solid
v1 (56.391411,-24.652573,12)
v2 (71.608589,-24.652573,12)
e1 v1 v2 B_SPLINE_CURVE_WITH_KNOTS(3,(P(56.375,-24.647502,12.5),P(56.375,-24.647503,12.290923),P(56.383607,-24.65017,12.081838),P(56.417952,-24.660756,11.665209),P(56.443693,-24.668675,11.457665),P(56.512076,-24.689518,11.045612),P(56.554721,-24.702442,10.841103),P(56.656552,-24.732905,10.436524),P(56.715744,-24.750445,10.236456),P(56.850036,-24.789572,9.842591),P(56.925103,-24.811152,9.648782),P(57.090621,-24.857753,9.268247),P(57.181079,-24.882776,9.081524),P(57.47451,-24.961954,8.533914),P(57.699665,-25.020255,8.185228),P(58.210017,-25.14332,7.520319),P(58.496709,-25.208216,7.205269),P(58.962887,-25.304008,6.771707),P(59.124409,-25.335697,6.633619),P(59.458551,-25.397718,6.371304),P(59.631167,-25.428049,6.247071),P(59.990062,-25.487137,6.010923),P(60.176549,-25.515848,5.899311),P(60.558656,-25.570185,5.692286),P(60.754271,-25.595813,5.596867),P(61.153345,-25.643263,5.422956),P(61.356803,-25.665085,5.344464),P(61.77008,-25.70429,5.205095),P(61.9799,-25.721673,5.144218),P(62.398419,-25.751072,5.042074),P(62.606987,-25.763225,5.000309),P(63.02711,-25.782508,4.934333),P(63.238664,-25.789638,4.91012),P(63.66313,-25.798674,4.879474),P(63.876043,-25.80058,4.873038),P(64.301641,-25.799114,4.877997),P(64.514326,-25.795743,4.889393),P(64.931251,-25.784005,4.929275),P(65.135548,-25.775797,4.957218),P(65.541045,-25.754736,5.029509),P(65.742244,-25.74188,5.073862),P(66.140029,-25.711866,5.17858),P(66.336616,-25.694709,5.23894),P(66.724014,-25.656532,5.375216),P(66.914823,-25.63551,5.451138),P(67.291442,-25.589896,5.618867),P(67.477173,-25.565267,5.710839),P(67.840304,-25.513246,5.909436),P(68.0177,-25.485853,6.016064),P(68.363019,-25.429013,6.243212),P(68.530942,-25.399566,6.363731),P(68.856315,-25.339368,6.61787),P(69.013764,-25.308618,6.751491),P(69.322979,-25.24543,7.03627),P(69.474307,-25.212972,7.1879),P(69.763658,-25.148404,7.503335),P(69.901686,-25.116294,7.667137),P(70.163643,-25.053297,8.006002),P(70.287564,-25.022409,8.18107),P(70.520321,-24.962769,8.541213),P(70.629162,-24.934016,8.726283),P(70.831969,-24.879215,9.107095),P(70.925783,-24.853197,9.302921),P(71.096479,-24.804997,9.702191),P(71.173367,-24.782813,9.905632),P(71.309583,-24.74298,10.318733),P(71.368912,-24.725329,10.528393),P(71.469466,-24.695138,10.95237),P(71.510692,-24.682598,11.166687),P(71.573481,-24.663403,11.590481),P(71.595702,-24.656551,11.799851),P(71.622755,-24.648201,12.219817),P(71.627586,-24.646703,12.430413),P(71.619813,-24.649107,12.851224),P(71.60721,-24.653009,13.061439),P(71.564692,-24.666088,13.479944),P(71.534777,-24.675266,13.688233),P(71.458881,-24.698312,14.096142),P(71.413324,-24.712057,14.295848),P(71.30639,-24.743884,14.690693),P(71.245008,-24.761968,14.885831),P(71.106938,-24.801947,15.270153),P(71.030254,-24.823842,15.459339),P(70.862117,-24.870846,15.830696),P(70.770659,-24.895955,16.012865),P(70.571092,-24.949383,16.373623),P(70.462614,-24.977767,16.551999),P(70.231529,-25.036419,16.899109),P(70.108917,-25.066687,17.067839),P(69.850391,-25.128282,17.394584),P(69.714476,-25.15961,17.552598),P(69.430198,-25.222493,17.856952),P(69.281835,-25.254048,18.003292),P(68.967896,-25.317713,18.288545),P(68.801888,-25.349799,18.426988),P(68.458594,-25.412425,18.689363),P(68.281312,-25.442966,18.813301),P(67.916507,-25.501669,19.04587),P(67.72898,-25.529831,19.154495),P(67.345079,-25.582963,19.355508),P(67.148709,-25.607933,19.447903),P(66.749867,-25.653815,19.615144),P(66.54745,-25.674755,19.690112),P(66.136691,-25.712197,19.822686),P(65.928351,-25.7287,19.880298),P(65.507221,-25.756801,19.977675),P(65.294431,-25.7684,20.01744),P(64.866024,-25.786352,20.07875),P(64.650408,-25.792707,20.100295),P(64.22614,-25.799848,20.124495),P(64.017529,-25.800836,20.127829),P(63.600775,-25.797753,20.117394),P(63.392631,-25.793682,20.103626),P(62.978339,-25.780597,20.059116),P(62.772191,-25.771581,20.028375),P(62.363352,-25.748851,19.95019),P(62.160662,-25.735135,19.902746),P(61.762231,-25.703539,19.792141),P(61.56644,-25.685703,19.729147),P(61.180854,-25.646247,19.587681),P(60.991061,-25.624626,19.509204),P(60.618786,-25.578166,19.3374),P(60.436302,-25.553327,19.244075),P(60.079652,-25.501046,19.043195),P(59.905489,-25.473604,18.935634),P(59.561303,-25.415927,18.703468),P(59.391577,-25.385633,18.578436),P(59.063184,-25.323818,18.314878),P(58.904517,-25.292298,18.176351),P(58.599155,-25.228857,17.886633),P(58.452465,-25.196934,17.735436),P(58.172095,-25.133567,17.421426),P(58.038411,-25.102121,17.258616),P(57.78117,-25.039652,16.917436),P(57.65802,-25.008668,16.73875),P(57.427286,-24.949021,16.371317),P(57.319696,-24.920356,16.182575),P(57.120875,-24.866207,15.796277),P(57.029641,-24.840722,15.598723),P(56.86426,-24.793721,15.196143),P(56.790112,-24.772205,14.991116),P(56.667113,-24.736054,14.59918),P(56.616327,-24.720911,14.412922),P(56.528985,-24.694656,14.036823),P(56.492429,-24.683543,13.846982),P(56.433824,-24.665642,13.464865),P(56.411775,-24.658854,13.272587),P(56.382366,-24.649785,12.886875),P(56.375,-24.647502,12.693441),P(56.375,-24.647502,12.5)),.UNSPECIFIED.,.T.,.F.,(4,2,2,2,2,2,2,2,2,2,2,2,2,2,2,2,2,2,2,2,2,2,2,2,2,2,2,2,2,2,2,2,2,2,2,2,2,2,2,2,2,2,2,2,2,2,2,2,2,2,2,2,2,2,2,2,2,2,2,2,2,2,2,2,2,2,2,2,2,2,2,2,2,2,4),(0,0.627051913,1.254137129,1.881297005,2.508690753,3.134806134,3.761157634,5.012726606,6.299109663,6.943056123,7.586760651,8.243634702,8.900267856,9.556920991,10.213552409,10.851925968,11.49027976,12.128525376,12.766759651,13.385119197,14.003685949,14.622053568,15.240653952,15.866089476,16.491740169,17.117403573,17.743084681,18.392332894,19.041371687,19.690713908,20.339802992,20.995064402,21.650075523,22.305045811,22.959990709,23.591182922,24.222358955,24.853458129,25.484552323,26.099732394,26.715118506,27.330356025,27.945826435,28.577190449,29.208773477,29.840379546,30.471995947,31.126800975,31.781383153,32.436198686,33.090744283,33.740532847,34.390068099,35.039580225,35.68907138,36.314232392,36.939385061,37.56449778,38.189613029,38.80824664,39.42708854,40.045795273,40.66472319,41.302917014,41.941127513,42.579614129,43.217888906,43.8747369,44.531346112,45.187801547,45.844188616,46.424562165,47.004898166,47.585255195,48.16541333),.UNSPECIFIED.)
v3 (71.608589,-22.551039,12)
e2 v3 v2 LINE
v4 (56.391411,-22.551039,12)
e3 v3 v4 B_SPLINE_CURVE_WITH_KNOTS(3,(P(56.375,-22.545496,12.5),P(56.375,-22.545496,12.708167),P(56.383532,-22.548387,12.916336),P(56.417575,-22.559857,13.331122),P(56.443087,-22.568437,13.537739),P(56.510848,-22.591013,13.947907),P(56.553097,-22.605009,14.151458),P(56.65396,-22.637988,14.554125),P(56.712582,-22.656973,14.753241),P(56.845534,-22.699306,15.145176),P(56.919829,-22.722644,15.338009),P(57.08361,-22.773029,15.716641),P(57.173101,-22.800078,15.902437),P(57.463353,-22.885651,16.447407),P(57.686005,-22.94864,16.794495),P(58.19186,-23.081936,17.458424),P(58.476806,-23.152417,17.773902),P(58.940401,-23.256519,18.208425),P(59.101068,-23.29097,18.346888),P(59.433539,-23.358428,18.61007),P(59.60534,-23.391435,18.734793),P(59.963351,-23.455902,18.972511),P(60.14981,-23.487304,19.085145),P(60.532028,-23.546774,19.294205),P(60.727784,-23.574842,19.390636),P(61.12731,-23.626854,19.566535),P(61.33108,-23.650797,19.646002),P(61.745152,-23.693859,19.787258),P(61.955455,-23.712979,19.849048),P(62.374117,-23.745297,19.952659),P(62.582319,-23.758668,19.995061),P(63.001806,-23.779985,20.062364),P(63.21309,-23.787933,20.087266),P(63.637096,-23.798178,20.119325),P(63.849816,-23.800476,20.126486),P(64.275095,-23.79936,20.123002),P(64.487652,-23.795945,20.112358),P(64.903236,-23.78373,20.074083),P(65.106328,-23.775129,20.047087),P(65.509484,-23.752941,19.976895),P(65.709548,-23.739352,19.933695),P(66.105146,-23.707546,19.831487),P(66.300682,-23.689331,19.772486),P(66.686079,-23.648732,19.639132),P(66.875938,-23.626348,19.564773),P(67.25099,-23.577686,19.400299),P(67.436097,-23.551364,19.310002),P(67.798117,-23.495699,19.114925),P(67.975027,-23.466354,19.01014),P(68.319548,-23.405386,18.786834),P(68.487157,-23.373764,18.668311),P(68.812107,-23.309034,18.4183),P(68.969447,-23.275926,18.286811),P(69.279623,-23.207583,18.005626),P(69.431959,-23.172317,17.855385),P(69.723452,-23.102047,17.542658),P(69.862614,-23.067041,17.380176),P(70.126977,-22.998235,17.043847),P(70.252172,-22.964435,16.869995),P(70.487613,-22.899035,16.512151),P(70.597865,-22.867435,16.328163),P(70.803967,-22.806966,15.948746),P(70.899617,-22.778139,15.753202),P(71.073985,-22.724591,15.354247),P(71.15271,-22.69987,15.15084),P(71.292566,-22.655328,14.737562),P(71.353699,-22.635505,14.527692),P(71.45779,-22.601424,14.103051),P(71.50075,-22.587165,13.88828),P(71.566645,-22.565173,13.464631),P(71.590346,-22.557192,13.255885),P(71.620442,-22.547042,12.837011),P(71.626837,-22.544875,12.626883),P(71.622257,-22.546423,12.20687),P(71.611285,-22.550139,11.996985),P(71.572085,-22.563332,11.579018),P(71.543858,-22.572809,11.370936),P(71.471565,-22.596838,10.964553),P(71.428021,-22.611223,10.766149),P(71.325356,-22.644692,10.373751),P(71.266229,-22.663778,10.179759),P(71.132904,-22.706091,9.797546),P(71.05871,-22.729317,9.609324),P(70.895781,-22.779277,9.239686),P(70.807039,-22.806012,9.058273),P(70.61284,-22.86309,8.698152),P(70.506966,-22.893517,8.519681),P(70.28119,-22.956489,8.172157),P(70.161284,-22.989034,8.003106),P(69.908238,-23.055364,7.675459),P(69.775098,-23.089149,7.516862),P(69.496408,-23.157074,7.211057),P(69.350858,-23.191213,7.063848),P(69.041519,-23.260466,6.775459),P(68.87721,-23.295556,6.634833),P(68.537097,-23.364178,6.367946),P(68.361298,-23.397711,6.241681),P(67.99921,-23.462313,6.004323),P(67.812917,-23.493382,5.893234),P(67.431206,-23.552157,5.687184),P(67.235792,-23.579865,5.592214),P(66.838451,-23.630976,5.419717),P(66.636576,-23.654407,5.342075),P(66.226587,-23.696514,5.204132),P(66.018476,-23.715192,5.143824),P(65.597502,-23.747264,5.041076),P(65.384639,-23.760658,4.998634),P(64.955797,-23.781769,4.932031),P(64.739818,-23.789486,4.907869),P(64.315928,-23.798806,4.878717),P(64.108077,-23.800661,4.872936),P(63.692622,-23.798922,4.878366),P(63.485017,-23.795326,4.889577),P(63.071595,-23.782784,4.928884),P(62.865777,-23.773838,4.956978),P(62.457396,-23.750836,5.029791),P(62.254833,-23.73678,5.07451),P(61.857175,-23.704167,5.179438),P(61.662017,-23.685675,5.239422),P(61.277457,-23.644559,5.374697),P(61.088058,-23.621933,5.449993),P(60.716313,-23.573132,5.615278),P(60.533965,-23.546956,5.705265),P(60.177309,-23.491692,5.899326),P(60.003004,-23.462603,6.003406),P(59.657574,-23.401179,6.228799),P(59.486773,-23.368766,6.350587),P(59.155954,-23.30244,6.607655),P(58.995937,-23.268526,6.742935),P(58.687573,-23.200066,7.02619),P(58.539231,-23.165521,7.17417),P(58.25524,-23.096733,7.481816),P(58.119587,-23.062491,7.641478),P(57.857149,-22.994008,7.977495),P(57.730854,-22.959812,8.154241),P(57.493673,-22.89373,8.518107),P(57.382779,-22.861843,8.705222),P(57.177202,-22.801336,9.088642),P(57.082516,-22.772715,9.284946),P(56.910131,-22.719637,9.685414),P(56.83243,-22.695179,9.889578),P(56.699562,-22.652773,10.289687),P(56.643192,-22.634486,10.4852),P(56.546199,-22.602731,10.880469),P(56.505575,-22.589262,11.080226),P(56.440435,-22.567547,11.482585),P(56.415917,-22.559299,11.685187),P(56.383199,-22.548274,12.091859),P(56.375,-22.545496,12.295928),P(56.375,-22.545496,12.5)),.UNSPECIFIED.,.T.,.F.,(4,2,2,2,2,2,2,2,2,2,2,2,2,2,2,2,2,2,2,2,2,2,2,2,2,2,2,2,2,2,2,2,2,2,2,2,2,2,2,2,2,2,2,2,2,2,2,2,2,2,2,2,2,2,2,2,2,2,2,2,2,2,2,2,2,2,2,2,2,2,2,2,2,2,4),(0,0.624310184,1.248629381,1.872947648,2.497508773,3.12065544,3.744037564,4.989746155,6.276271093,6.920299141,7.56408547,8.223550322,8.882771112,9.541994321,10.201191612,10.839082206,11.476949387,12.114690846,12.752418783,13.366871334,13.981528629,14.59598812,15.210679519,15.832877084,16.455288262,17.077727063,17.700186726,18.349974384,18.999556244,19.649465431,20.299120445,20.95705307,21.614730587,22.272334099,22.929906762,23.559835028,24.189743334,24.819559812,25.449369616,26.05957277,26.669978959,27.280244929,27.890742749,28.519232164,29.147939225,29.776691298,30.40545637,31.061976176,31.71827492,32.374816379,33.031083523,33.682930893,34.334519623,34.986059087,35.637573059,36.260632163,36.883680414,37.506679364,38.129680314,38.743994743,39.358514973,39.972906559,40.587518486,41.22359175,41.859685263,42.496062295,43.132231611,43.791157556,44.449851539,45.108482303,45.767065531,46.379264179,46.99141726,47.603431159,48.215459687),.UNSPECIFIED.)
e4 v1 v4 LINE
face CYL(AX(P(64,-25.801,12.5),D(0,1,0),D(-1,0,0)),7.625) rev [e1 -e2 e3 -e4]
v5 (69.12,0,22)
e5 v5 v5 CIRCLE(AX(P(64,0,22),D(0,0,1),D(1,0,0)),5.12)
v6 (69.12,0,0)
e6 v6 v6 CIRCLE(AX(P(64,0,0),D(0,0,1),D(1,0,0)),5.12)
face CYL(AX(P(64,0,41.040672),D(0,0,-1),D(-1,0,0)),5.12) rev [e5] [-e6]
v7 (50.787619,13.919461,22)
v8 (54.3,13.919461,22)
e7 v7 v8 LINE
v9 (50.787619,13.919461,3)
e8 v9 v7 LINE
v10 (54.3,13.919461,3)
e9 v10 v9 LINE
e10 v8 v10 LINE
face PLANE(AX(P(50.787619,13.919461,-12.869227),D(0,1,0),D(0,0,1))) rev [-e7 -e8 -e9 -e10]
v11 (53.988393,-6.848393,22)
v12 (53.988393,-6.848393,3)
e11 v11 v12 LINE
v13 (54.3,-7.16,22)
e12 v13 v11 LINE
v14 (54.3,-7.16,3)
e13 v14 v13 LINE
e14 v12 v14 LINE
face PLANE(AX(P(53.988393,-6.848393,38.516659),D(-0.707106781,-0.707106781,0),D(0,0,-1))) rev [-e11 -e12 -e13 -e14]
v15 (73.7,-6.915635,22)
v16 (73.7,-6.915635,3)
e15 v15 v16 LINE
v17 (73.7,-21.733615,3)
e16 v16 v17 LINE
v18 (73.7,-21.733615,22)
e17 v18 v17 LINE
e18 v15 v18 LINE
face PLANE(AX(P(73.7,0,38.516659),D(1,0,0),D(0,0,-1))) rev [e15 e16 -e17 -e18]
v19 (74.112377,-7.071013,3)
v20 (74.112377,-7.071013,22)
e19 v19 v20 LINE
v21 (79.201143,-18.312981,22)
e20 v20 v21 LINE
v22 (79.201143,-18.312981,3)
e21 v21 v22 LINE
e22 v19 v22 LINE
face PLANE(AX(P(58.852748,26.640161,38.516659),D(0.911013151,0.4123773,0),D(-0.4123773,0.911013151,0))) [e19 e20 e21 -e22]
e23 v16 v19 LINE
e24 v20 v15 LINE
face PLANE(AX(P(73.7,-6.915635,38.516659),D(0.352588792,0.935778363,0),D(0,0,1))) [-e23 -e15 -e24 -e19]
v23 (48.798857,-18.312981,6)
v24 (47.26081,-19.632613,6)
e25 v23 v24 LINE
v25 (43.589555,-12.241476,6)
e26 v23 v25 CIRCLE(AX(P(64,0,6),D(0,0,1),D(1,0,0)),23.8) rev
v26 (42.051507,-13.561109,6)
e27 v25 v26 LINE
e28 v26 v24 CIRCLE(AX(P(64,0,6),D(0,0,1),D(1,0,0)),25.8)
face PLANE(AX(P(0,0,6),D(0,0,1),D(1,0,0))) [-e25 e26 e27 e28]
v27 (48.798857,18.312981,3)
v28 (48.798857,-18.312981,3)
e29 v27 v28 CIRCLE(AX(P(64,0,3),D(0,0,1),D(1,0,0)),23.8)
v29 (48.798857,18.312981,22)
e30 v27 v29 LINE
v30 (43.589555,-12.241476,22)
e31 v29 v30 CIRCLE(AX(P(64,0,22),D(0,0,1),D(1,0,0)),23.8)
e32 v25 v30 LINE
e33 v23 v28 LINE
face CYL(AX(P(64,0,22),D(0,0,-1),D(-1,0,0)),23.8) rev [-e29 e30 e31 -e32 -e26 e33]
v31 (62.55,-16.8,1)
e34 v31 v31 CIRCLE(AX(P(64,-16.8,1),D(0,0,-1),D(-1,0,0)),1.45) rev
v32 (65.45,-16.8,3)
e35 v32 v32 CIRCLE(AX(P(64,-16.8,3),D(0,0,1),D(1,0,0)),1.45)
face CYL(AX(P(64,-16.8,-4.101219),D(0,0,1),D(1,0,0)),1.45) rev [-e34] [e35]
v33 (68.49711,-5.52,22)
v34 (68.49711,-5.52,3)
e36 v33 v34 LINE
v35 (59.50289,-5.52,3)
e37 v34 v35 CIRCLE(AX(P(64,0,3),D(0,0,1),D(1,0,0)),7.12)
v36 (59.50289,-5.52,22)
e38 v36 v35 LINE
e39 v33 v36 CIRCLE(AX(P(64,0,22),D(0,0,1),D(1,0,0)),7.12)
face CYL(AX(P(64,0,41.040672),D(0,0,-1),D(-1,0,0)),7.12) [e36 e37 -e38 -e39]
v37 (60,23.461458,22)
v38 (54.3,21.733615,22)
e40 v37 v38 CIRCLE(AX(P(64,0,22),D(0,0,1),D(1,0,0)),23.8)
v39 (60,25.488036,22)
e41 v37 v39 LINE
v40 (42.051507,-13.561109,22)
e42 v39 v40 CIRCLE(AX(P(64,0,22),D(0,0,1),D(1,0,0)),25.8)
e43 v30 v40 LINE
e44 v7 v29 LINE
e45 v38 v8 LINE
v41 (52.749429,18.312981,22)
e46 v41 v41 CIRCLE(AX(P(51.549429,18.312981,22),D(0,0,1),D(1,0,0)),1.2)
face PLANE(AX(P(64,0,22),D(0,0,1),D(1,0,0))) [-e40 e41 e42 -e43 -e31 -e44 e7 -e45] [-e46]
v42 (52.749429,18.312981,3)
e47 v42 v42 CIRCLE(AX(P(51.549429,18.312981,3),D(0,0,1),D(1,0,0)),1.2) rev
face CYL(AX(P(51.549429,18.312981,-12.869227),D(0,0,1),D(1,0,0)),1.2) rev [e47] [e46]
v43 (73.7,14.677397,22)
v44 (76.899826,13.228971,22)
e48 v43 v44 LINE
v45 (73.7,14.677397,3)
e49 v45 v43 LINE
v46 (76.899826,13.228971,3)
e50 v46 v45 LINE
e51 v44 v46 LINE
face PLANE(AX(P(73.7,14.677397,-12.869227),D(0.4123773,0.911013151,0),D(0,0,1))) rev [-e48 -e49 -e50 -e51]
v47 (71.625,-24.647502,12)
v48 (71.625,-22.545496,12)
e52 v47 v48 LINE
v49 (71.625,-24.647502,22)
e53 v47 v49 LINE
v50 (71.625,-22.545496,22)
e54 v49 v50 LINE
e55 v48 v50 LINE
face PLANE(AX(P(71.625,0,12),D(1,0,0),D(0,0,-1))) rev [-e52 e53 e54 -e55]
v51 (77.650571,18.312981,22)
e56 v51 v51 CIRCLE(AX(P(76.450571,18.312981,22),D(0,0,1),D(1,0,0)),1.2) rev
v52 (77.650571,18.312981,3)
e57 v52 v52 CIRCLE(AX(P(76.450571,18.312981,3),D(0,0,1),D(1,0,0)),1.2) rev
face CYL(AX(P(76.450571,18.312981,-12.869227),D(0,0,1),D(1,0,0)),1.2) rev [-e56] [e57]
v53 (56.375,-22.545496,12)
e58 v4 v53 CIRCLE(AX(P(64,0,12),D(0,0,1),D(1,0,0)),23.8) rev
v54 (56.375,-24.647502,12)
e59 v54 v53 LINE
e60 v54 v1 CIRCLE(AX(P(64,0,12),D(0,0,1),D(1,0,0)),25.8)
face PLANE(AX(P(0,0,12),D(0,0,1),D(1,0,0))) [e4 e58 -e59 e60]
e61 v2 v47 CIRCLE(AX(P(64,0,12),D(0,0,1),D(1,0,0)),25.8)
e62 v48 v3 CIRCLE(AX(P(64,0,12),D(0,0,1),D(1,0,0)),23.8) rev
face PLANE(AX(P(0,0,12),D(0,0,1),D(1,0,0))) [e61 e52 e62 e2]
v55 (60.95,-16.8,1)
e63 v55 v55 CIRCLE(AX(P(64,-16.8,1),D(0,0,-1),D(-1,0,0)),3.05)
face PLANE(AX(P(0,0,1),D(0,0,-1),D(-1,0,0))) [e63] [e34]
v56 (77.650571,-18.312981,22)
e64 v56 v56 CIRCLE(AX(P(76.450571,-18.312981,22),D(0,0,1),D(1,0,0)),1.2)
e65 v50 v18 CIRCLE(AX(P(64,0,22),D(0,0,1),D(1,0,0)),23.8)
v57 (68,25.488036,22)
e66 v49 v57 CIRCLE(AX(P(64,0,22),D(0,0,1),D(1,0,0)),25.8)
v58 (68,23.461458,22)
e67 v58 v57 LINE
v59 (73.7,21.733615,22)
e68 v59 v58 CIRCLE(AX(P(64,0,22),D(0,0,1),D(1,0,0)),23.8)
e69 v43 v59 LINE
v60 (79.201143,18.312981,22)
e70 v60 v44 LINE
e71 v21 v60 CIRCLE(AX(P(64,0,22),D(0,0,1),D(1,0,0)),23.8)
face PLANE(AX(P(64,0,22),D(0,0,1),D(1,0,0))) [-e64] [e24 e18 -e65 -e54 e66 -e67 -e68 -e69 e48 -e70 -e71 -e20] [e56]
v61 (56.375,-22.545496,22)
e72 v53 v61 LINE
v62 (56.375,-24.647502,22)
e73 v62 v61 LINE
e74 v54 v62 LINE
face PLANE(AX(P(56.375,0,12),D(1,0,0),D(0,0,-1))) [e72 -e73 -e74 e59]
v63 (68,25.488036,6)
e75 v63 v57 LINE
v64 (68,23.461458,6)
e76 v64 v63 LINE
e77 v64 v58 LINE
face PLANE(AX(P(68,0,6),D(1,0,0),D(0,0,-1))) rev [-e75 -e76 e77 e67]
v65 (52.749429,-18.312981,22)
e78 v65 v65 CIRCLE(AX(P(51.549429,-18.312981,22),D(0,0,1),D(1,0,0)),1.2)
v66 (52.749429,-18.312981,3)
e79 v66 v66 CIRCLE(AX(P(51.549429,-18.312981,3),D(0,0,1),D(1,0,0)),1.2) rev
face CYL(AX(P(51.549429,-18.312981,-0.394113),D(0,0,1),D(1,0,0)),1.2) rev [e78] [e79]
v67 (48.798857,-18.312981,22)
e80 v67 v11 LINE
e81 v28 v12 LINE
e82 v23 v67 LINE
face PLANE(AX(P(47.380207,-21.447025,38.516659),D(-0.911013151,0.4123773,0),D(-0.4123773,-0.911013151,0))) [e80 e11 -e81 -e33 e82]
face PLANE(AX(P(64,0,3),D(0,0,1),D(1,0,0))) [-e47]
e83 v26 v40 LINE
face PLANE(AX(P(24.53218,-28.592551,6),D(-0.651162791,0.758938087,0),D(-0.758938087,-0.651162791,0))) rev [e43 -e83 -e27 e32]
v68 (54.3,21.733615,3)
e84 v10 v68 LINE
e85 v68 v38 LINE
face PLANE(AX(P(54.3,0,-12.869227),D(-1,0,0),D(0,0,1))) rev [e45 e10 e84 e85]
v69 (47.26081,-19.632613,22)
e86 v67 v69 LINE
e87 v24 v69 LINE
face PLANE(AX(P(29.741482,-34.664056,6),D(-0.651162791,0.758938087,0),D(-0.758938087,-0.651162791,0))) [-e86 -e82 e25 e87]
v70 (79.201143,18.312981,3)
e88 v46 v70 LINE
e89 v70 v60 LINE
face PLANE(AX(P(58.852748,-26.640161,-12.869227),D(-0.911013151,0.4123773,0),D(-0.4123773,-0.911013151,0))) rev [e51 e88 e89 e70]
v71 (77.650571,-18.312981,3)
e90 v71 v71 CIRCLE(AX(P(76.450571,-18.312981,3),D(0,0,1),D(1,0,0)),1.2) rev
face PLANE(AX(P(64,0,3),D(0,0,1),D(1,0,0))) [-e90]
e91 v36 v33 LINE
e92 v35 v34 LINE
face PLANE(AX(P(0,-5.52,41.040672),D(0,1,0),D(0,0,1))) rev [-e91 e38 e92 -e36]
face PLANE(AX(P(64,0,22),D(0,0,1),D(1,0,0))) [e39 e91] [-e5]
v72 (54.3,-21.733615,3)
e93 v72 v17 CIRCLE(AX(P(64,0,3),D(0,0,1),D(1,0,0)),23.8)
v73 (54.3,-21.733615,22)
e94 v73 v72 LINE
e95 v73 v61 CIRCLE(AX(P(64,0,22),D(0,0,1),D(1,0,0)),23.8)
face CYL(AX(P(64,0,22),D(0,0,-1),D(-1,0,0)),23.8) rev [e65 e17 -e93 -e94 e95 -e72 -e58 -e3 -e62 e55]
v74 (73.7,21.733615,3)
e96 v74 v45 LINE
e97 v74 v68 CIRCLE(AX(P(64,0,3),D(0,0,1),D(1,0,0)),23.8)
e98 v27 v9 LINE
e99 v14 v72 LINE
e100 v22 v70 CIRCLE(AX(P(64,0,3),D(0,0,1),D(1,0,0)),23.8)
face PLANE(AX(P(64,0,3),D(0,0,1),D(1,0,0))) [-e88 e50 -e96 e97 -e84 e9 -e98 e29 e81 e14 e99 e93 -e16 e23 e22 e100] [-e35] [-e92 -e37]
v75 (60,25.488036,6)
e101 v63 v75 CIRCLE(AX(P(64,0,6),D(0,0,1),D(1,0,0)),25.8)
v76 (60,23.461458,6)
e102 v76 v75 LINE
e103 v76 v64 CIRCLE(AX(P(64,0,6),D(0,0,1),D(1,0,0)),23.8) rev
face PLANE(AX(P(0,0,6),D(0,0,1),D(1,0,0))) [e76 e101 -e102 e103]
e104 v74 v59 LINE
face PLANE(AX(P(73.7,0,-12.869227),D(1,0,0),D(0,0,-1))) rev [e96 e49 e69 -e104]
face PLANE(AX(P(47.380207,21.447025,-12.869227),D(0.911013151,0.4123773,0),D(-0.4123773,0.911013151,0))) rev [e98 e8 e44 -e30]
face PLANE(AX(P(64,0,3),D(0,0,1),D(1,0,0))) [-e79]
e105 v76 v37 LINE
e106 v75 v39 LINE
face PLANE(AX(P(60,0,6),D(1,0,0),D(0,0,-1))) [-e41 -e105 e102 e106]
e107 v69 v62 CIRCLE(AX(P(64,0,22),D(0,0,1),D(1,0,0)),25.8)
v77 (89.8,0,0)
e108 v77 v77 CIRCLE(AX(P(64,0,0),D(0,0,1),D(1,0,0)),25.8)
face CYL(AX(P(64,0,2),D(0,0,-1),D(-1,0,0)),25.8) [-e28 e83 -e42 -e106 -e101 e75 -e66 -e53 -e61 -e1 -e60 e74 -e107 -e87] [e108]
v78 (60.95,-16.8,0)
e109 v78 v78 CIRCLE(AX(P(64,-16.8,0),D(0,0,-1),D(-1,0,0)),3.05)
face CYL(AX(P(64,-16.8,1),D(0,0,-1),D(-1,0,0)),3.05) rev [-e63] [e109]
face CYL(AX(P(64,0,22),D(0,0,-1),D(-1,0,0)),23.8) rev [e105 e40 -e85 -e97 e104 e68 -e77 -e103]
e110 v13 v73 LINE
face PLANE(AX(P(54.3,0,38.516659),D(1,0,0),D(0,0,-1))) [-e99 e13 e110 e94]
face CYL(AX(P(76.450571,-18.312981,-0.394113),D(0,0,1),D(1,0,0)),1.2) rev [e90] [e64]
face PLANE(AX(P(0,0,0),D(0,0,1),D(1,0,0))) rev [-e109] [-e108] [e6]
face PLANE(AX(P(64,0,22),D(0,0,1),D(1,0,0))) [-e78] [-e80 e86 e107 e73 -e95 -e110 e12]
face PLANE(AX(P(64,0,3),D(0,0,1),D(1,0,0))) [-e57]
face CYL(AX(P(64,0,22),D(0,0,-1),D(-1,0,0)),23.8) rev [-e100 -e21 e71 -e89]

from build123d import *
from OCP.BRepFilletAPI import BRepFilletAPI_MakeChamfer

# Parameters (mm, degrees)
SKETCH_1_R               = 5
EXTRUDE_1_DEPTH          = 2
EXTRUDE_2_DEPTH          = 20
EXTRUDE_2_DEPTH_BACK     = 2
SKETCH_2_R               = 25.8
SKETCH_2_R_2             = 23.8
SKETCH_3_R               = 1.45
CUT_EXTRUDE_2_DEPTH      = 2
SKETCH_4_R               = 23.8
SKETCH_4_R_2             = 1.45
EXTRUDE_3_DEPTH          = 1
SKETCH_5_R               = 3.05
SKETCH_5_R_2             = 1.45
CUT_EXTRUDE_3_DEPTH      = 1
CUT_EXTRUDE_5_REACH      = 62.647
CUT_EXTRUDE_5_END_RADIUS = 25.8
SKETCH_6_R               = 7.625
CUT_EXTRUDE_START        = -16
CUT_EXTRUDE_6_DEPTH      = 16
EXTRUDE_5_DEPTH          = 19
CHAMFER_1_SIZE           = 1
CHAMFER_1_SIZE2          = 0.755634891
SKETCH_9_R               = 5.12
EXTRUDE_6_DEPTH          = 19
EXTRUDE_START            = -19
SKETCH_11_R              = 1.2
EXTRUDE_7_DEPTH          = 19
CHAMFER_3_SIZE           = 7.761762605
CHAMFER_3_SIZE_2         = 10
SKETCH_13_R              = 1.2
CUT_EXTRUDE_7_DEPTH      = 19
CUT_EXTRUDE_START_2      = -10
CUT_EXTRUDE_8_DEPTH      = 10
SKETCH_15_R              = 5.12
CUT_EXTRUDE_9_DEPTH      = 10


with BuildPart() as part:
    # 草图1 → 凸台-拉伸1 (new body)
    with BuildSketch(Plane.XY):
        with BuildLine():
            ThreePointArc((64, 25.8), (38.2, 0), (64, -25.8))
            ThreePointArc((64, -25.8), (82.243354955, -18.243354955), (89.8, 0))
            ThreePointArc((89.8, 0), (82.243354955, 18.243354955), (64, 25.8))
        make_face()
        with Locations((64, 0)):
            Circle(SKETCH_1_R, mode=Mode.SUBTRACT)
    extrude(amount=EXTRUDE_1_DEPTH)

    # 草图2 → 凸台-拉伸2 (add, two sides: drawn at the far end of the back side and taken through both)
    with BuildSketch(Plane.XY.offset(2).offset(-EXTRUDE_2_DEPTH_BACK)):
        with Locations((64, 0)):
            Circle(SKETCH_2_R)
        with Locations((64, 0)):
            Circle(SKETCH_2_R_2, mode=Mode.SUBTRACT)
    extrude(amount=EXTRUDE_2_DEPTH + EXTRUDE_2_DEPTH_BACK)

    # 草图3 → 切除-拉伸2 (cut)
    with BuildSketch(Plane.XY.offset(2)):
        with Locations((64, -16.8)):
            Circle(SKETCH_3_R)
    extrude(amount=-CUT_EXTRUDE_2_DEPTH, mode=Mode.SUBTRACT)

    # 草图4 → 凸台-拉伸3 (add)
    with BuildSketch(Plane.XY.offset(2)):
        with Locations((64, 0)):
            Circle(SKETCH_4_R)
        with Locations((64, -16.8)):
            Circle(SKETCH_4_R_2, mode=Mode.SUBTRACT)
    extrude(amount=EXTRUDE_3_DEPTH)

    # 草图5 → 切除-拉伸3 (cut)
    with BuildSketch(Plane(origin=(0, 0, 0), x_dir=(-1, 0, 0), z_dir=(0, 0, -1))):
        with Locations((-64, -16.8)):
            Circle(SKETCH_5_R)
        with Locations(Location((-64, -16.8, 0), (0, 0, 180))):
            Circle(SKETCH_5_R_2, mode=Mode.SUBTRACT)
    extrude(amount=-CUT_EXTRUDE_3_DEPTH, mode=Mode.SUBTRACT)

    # 切除-拉伸5: up to this cylinder (the profile starts inside it)
    cut_extrude_5_end = Plane(origin=(64, 0, 12.5), z_dir=(0, 0, -1)) * Cylinder(CUT_EXTRUDE_5_END_RADIUS, 177.894, mode=Mode.PRIVATE)
    # 草图6 → 切除-拉伸5 (cut, up to the surface)
    with BuildSketch(Plane(origin=(74.5, -5.45, -15.2), x_dir=(0, 0, -1), z_dir=(0, 1, 0)), mode=Mode.PRIVATE) as cut_extrude_5_sk1:
        with Locations(Location((-27.7, 10.5, 0), (0, 0, 90))):
            Circle(SKETCH_6_R)
    cut_extrude_5_tool1 = extrude(cut_extrude_5_sk1.sketch, amount=-CUT_EXTRUDE_5_REACH, mode=Mode.PRIVATE) & cut_extrude_5_end
    add(cut_extrude_5_tool1.solids().sort_by_distance((64, -5.45, 12.5))[0], mode=Mode.SUBTRACT)

    # 草图7 → 切除-拉伸6 (cut)
    with BuildSketch(Plane.XY.offset(22).offset(CUT_EXTRUDE_START)):
        with BuildLine():
            ThreePointArc((48.798857294, -18.312980654), (47.30860295, -16.965767431), (45.937273528, -15.497674419))
            Line((45.937273528, -15.497674419), (44.419397354, -16.8))
            ThreePointArc((44.419397354, -16.8), (45.784957677, -18.271623715), (47.260809567, -19.632613266))
            Line((47.260809567, -19.632613266), (48.798857294, -18.312980654))
        make_face()
        with BuildLine():
            Line((44.419397354, -16.8), (45.937273528, -15.497674419))
            ThreePointArc((45.937273528, -15.497674419), (44.694639643, -13.919161667), (43.589554969, -12.241475957))
            Line((43.589554969, -12.241475957), (42.051507242, -13.561108569))
            ThreePointArc((42.051507242, -13.561108569), (43.172397024, -15.22665276), (44.419397354, -16.8))
        make_face()
        with BuildLine():
            Line((64, 25.8), (64, 23.8))
            ThreePointArc((64, 23.8), (66.007150396, 23.715213414), (68, 23.461457755))
            Line((68, 23.461457755), (68, 25.488036409))
            ThreePointArc((68, 25.488036409), (66.006073359, 25.721890865), (64, 25.8))
        make_face()
        with BuildLine():
            ThreePointArc((60, 23.461457755), (61.992849604, 23.715213414), (64, 23.8))
            Line((64, 23.8), (64, 25.8))
            ThreePointArc((64, 25.8), (61.993926641, 25.721890865), (60, 25.488036409))
            Line((60, 25.488036409), (60, 23.461457755))
        make_face()
    extrude(amount=CUT_EXTRUDE_6_DEPTH, mode=Mode.SUBTRACT)

    # 草图8 → 凸台-拉伸5 (add)
    with BuildSketch(Plane.XY.offset(3)):
        with BuildLine():
            Line((73.7, -20.16), (73.7, -21.733614518))
            ThreePointArc((73.7, -21.733614518), (76.567494222, -20.211335655), (79.201142706, -18.312980654))
            Line((79.201142706, -18.312980654), (73.7, -6.16))
            Line((73.7, -6.16), (73.7, -20.16))
        make_face()
        with BuildLine():
            Line((54.3, -20.16), (54.3, -6.16))
            Line((54.3, -6.16), (48.798857294, -18.312980654))
            ThreePointArc((48.798857294, -18.312980654), (51.432505778, -20.211335655), (54.3, -21.733614518))
            Line((54.3, -21.733614518), (54.3, -20.16))
        make_face()
    extrude(amount=EXTRUDE_5_DEPTH)

    # 倒角1: one chamfer whose edges measure the first distance from different faces: ONE call of the kernel's chamfer builder (chamfer() names one face for all edges)
    chamfer_1_edges_1 = [part.edges().sort_by_distance(p)[0] for p in [
        (73.7, -6.16, 12.5),
    ]]
    chamfer_1_side_1 = [part.faces().sort_by_distance(p)[0] for p in [
        (76.450571353, -12.236490327, 12.5),
    ]]
    chamfer_1_edges_2 = [part.edges().sort_by_distance(p)[0] for p in [
        (54.3, -6.16, 12.5),
    ]]
    chamfer_1_side_2 = [part.faces().sort_by_distance(p)[0] for p in [
        (54.3, -13.946807259, 12.5),
    ]]
    chamfer_1 = BRepFilletAPI_MakeChamfer(part.part.solid().wrapped)
    for e in chamfer_1_edges_1:
        chamfer_1.Add(CHAMFER_1_SIZE, CHAMFER_1_SIZE2, e.wrapped, chamfer_1_side_1[0].wrapped)  # the first distance lies on this face
    for e in chamfer_1_edges_2:
        chamfer_1.Add(CHAMFER_1_SIZE, CHAMFER_1_SIZE2, e.wrapped, chamfer_1_side_2[0].wrapped)  # the first distance lies on this face
    add(Compound.cast(chamfer_1.Shape()), mode=Mode.REPLACE)

    # 草图9 → 凸台-拉伸6 (add)
    with BuildSketch(Plane.XY.offset(3)):
        with BuildLine():
            ThreePointArc((71.12, 0), (60.944269687, 6.430934011), (59.502889817, -5.52))
            Line((59.502889817, -5.52), (64, -5.52))
            Line((64, -5.52), (68.497110183, -5.52))
            ThreePointArc((68.497110183, -5.52), (70.430934011, -3.055730313), (71.12, 0))
        make_face()
        with Locations((64, 0)):
            Circle(SKETCH_9_R, mode=Mode.SUBTRACT)
    extrude(amount=EXTRUDE_6_DEPTH)

    # 草图11 → 凸台-拉伸7 (add)
    # profile 1 of 2: a face of its own
    with BuildSketch(Plane.XY.offset(22).offset(EXTRUDE_START)):
        with BuildLine():
            Line((74.1123773, 7.071013151), (79.201142706, 18.312980654))
            ThreePointArc((79.201142706, 18.312980654), (76.567494222, 20.211335655), (73.7, 21.733614518))
            Line((73.7, 21.733614518), (73.7, 6.915634891))
            Line((73.7, 6.915634891), (74.1123773, 7.071013151))
        make_face()
        with Locations((76.450571353, 18.312980654)):
            Circle(SKETCH_11_R, mode=Mode.SUBTRACT)
    # profile 2 of 2: a face of its own
    with BuildSketch(Plane.XY.offset(22).offset(EXTRUDE_START)):
        with BuildLine():
            ThreePointArc((54.3, 21.733614518), (51.432505778, 20.211335655), (48.798857294, 18.312980654))
            Line((48.798857294, 18.312980654), (53.988393324, 6.848393324))
            Line((53.988393324, 6.848393324), (54.3, 7.16))
            Line((54.3, 7.16), (54.3, 21.733614518))
        make_face()
        with Locations((51.549428647, 18.312980654)):
            Circle(SKETCH_11_R, mode=Mode.SUBTRACT)
    extrude(amount=EXTRUDE_7_DEPTH)

    # 倒角3
    # the kernel refuses this chamfer: 10, 7.761762605 mm, written as the material it takes off along each edge
    with BuildSketch(Plane(origin=(53.988393324, 6.848393324, 3), x_dir=(-0.45377895497770065, 0.8911142799996788, 0), z_dir=(0, 0, 1)), Plane(origin=(73.7, 6.915634891, 3), x_dir=(-0.045923294763777815, 0.9989449689537653, 0), z_dir=(0, 0, 1))) as chamfer_3_piece_1:
        Polygon((CHAMFER_3_SIZE * 0.998944968965, -CHAMFER_3_SIZE * 0.0459232947643), (CHAMFER_3_SIZE_2 * 0.309242773975, -CHAMFER_3_SIZE_2 * 0.950983126424), (0, 0), align=None)
    extrude(amount=44.71682988, mode=Mode.SUBTRACT)

    # 草图13 → 切除-拉伸7 (cut)
    with BuildSketch(Plane.XY.offset(22)):
        with Locations((76.450571353, -18.312980654)):
            Circle(SKETCH_13_R)
        with Locations((51.549428647, -18.312980654)):
            Circle(SKETCH_13_R)
    extrude(amount=-CUT_EXTRUDE_7_DEPTH, mode=Mode.SUBTRACT)

    # 草图14 → 切除-拉伸8 (cut)
    with BuildSketch(Plane.XY.offset(22).offset(CUT_EXTRUDE_START_2)):
        with BuildLine():
            Line((56.375, -22.54549567), (56.375, -24.647502409))
            ThreePointArc((56.375, -24.647502409), (64, -25.8), (71.625, -24.647502409))
            Line((71.625, -24.647502409), (71.625, -22.54549567))
            ThreePointArc((71.625, -22.54549567), (64, -23.8), (56.375, -22.54549567))
        make_face()
    extrude(amount=CUT_EXTRUDE_8_DEPTH, mode=Mode.SUBTRACT)

    # 草图15 → 切除-拉伸9 (cut)
    with BuildSketch(Plane.XY.offset(3).offset(CUT_EXTRUDE_START_2)):
        with Locations((64, 0)):
            Circle(SKETCH_15_R)
    extrude(amount=CUT_EXTRUDE_9_DEPTH, mode=Mode.SUBTRACT)


solid = part.part
